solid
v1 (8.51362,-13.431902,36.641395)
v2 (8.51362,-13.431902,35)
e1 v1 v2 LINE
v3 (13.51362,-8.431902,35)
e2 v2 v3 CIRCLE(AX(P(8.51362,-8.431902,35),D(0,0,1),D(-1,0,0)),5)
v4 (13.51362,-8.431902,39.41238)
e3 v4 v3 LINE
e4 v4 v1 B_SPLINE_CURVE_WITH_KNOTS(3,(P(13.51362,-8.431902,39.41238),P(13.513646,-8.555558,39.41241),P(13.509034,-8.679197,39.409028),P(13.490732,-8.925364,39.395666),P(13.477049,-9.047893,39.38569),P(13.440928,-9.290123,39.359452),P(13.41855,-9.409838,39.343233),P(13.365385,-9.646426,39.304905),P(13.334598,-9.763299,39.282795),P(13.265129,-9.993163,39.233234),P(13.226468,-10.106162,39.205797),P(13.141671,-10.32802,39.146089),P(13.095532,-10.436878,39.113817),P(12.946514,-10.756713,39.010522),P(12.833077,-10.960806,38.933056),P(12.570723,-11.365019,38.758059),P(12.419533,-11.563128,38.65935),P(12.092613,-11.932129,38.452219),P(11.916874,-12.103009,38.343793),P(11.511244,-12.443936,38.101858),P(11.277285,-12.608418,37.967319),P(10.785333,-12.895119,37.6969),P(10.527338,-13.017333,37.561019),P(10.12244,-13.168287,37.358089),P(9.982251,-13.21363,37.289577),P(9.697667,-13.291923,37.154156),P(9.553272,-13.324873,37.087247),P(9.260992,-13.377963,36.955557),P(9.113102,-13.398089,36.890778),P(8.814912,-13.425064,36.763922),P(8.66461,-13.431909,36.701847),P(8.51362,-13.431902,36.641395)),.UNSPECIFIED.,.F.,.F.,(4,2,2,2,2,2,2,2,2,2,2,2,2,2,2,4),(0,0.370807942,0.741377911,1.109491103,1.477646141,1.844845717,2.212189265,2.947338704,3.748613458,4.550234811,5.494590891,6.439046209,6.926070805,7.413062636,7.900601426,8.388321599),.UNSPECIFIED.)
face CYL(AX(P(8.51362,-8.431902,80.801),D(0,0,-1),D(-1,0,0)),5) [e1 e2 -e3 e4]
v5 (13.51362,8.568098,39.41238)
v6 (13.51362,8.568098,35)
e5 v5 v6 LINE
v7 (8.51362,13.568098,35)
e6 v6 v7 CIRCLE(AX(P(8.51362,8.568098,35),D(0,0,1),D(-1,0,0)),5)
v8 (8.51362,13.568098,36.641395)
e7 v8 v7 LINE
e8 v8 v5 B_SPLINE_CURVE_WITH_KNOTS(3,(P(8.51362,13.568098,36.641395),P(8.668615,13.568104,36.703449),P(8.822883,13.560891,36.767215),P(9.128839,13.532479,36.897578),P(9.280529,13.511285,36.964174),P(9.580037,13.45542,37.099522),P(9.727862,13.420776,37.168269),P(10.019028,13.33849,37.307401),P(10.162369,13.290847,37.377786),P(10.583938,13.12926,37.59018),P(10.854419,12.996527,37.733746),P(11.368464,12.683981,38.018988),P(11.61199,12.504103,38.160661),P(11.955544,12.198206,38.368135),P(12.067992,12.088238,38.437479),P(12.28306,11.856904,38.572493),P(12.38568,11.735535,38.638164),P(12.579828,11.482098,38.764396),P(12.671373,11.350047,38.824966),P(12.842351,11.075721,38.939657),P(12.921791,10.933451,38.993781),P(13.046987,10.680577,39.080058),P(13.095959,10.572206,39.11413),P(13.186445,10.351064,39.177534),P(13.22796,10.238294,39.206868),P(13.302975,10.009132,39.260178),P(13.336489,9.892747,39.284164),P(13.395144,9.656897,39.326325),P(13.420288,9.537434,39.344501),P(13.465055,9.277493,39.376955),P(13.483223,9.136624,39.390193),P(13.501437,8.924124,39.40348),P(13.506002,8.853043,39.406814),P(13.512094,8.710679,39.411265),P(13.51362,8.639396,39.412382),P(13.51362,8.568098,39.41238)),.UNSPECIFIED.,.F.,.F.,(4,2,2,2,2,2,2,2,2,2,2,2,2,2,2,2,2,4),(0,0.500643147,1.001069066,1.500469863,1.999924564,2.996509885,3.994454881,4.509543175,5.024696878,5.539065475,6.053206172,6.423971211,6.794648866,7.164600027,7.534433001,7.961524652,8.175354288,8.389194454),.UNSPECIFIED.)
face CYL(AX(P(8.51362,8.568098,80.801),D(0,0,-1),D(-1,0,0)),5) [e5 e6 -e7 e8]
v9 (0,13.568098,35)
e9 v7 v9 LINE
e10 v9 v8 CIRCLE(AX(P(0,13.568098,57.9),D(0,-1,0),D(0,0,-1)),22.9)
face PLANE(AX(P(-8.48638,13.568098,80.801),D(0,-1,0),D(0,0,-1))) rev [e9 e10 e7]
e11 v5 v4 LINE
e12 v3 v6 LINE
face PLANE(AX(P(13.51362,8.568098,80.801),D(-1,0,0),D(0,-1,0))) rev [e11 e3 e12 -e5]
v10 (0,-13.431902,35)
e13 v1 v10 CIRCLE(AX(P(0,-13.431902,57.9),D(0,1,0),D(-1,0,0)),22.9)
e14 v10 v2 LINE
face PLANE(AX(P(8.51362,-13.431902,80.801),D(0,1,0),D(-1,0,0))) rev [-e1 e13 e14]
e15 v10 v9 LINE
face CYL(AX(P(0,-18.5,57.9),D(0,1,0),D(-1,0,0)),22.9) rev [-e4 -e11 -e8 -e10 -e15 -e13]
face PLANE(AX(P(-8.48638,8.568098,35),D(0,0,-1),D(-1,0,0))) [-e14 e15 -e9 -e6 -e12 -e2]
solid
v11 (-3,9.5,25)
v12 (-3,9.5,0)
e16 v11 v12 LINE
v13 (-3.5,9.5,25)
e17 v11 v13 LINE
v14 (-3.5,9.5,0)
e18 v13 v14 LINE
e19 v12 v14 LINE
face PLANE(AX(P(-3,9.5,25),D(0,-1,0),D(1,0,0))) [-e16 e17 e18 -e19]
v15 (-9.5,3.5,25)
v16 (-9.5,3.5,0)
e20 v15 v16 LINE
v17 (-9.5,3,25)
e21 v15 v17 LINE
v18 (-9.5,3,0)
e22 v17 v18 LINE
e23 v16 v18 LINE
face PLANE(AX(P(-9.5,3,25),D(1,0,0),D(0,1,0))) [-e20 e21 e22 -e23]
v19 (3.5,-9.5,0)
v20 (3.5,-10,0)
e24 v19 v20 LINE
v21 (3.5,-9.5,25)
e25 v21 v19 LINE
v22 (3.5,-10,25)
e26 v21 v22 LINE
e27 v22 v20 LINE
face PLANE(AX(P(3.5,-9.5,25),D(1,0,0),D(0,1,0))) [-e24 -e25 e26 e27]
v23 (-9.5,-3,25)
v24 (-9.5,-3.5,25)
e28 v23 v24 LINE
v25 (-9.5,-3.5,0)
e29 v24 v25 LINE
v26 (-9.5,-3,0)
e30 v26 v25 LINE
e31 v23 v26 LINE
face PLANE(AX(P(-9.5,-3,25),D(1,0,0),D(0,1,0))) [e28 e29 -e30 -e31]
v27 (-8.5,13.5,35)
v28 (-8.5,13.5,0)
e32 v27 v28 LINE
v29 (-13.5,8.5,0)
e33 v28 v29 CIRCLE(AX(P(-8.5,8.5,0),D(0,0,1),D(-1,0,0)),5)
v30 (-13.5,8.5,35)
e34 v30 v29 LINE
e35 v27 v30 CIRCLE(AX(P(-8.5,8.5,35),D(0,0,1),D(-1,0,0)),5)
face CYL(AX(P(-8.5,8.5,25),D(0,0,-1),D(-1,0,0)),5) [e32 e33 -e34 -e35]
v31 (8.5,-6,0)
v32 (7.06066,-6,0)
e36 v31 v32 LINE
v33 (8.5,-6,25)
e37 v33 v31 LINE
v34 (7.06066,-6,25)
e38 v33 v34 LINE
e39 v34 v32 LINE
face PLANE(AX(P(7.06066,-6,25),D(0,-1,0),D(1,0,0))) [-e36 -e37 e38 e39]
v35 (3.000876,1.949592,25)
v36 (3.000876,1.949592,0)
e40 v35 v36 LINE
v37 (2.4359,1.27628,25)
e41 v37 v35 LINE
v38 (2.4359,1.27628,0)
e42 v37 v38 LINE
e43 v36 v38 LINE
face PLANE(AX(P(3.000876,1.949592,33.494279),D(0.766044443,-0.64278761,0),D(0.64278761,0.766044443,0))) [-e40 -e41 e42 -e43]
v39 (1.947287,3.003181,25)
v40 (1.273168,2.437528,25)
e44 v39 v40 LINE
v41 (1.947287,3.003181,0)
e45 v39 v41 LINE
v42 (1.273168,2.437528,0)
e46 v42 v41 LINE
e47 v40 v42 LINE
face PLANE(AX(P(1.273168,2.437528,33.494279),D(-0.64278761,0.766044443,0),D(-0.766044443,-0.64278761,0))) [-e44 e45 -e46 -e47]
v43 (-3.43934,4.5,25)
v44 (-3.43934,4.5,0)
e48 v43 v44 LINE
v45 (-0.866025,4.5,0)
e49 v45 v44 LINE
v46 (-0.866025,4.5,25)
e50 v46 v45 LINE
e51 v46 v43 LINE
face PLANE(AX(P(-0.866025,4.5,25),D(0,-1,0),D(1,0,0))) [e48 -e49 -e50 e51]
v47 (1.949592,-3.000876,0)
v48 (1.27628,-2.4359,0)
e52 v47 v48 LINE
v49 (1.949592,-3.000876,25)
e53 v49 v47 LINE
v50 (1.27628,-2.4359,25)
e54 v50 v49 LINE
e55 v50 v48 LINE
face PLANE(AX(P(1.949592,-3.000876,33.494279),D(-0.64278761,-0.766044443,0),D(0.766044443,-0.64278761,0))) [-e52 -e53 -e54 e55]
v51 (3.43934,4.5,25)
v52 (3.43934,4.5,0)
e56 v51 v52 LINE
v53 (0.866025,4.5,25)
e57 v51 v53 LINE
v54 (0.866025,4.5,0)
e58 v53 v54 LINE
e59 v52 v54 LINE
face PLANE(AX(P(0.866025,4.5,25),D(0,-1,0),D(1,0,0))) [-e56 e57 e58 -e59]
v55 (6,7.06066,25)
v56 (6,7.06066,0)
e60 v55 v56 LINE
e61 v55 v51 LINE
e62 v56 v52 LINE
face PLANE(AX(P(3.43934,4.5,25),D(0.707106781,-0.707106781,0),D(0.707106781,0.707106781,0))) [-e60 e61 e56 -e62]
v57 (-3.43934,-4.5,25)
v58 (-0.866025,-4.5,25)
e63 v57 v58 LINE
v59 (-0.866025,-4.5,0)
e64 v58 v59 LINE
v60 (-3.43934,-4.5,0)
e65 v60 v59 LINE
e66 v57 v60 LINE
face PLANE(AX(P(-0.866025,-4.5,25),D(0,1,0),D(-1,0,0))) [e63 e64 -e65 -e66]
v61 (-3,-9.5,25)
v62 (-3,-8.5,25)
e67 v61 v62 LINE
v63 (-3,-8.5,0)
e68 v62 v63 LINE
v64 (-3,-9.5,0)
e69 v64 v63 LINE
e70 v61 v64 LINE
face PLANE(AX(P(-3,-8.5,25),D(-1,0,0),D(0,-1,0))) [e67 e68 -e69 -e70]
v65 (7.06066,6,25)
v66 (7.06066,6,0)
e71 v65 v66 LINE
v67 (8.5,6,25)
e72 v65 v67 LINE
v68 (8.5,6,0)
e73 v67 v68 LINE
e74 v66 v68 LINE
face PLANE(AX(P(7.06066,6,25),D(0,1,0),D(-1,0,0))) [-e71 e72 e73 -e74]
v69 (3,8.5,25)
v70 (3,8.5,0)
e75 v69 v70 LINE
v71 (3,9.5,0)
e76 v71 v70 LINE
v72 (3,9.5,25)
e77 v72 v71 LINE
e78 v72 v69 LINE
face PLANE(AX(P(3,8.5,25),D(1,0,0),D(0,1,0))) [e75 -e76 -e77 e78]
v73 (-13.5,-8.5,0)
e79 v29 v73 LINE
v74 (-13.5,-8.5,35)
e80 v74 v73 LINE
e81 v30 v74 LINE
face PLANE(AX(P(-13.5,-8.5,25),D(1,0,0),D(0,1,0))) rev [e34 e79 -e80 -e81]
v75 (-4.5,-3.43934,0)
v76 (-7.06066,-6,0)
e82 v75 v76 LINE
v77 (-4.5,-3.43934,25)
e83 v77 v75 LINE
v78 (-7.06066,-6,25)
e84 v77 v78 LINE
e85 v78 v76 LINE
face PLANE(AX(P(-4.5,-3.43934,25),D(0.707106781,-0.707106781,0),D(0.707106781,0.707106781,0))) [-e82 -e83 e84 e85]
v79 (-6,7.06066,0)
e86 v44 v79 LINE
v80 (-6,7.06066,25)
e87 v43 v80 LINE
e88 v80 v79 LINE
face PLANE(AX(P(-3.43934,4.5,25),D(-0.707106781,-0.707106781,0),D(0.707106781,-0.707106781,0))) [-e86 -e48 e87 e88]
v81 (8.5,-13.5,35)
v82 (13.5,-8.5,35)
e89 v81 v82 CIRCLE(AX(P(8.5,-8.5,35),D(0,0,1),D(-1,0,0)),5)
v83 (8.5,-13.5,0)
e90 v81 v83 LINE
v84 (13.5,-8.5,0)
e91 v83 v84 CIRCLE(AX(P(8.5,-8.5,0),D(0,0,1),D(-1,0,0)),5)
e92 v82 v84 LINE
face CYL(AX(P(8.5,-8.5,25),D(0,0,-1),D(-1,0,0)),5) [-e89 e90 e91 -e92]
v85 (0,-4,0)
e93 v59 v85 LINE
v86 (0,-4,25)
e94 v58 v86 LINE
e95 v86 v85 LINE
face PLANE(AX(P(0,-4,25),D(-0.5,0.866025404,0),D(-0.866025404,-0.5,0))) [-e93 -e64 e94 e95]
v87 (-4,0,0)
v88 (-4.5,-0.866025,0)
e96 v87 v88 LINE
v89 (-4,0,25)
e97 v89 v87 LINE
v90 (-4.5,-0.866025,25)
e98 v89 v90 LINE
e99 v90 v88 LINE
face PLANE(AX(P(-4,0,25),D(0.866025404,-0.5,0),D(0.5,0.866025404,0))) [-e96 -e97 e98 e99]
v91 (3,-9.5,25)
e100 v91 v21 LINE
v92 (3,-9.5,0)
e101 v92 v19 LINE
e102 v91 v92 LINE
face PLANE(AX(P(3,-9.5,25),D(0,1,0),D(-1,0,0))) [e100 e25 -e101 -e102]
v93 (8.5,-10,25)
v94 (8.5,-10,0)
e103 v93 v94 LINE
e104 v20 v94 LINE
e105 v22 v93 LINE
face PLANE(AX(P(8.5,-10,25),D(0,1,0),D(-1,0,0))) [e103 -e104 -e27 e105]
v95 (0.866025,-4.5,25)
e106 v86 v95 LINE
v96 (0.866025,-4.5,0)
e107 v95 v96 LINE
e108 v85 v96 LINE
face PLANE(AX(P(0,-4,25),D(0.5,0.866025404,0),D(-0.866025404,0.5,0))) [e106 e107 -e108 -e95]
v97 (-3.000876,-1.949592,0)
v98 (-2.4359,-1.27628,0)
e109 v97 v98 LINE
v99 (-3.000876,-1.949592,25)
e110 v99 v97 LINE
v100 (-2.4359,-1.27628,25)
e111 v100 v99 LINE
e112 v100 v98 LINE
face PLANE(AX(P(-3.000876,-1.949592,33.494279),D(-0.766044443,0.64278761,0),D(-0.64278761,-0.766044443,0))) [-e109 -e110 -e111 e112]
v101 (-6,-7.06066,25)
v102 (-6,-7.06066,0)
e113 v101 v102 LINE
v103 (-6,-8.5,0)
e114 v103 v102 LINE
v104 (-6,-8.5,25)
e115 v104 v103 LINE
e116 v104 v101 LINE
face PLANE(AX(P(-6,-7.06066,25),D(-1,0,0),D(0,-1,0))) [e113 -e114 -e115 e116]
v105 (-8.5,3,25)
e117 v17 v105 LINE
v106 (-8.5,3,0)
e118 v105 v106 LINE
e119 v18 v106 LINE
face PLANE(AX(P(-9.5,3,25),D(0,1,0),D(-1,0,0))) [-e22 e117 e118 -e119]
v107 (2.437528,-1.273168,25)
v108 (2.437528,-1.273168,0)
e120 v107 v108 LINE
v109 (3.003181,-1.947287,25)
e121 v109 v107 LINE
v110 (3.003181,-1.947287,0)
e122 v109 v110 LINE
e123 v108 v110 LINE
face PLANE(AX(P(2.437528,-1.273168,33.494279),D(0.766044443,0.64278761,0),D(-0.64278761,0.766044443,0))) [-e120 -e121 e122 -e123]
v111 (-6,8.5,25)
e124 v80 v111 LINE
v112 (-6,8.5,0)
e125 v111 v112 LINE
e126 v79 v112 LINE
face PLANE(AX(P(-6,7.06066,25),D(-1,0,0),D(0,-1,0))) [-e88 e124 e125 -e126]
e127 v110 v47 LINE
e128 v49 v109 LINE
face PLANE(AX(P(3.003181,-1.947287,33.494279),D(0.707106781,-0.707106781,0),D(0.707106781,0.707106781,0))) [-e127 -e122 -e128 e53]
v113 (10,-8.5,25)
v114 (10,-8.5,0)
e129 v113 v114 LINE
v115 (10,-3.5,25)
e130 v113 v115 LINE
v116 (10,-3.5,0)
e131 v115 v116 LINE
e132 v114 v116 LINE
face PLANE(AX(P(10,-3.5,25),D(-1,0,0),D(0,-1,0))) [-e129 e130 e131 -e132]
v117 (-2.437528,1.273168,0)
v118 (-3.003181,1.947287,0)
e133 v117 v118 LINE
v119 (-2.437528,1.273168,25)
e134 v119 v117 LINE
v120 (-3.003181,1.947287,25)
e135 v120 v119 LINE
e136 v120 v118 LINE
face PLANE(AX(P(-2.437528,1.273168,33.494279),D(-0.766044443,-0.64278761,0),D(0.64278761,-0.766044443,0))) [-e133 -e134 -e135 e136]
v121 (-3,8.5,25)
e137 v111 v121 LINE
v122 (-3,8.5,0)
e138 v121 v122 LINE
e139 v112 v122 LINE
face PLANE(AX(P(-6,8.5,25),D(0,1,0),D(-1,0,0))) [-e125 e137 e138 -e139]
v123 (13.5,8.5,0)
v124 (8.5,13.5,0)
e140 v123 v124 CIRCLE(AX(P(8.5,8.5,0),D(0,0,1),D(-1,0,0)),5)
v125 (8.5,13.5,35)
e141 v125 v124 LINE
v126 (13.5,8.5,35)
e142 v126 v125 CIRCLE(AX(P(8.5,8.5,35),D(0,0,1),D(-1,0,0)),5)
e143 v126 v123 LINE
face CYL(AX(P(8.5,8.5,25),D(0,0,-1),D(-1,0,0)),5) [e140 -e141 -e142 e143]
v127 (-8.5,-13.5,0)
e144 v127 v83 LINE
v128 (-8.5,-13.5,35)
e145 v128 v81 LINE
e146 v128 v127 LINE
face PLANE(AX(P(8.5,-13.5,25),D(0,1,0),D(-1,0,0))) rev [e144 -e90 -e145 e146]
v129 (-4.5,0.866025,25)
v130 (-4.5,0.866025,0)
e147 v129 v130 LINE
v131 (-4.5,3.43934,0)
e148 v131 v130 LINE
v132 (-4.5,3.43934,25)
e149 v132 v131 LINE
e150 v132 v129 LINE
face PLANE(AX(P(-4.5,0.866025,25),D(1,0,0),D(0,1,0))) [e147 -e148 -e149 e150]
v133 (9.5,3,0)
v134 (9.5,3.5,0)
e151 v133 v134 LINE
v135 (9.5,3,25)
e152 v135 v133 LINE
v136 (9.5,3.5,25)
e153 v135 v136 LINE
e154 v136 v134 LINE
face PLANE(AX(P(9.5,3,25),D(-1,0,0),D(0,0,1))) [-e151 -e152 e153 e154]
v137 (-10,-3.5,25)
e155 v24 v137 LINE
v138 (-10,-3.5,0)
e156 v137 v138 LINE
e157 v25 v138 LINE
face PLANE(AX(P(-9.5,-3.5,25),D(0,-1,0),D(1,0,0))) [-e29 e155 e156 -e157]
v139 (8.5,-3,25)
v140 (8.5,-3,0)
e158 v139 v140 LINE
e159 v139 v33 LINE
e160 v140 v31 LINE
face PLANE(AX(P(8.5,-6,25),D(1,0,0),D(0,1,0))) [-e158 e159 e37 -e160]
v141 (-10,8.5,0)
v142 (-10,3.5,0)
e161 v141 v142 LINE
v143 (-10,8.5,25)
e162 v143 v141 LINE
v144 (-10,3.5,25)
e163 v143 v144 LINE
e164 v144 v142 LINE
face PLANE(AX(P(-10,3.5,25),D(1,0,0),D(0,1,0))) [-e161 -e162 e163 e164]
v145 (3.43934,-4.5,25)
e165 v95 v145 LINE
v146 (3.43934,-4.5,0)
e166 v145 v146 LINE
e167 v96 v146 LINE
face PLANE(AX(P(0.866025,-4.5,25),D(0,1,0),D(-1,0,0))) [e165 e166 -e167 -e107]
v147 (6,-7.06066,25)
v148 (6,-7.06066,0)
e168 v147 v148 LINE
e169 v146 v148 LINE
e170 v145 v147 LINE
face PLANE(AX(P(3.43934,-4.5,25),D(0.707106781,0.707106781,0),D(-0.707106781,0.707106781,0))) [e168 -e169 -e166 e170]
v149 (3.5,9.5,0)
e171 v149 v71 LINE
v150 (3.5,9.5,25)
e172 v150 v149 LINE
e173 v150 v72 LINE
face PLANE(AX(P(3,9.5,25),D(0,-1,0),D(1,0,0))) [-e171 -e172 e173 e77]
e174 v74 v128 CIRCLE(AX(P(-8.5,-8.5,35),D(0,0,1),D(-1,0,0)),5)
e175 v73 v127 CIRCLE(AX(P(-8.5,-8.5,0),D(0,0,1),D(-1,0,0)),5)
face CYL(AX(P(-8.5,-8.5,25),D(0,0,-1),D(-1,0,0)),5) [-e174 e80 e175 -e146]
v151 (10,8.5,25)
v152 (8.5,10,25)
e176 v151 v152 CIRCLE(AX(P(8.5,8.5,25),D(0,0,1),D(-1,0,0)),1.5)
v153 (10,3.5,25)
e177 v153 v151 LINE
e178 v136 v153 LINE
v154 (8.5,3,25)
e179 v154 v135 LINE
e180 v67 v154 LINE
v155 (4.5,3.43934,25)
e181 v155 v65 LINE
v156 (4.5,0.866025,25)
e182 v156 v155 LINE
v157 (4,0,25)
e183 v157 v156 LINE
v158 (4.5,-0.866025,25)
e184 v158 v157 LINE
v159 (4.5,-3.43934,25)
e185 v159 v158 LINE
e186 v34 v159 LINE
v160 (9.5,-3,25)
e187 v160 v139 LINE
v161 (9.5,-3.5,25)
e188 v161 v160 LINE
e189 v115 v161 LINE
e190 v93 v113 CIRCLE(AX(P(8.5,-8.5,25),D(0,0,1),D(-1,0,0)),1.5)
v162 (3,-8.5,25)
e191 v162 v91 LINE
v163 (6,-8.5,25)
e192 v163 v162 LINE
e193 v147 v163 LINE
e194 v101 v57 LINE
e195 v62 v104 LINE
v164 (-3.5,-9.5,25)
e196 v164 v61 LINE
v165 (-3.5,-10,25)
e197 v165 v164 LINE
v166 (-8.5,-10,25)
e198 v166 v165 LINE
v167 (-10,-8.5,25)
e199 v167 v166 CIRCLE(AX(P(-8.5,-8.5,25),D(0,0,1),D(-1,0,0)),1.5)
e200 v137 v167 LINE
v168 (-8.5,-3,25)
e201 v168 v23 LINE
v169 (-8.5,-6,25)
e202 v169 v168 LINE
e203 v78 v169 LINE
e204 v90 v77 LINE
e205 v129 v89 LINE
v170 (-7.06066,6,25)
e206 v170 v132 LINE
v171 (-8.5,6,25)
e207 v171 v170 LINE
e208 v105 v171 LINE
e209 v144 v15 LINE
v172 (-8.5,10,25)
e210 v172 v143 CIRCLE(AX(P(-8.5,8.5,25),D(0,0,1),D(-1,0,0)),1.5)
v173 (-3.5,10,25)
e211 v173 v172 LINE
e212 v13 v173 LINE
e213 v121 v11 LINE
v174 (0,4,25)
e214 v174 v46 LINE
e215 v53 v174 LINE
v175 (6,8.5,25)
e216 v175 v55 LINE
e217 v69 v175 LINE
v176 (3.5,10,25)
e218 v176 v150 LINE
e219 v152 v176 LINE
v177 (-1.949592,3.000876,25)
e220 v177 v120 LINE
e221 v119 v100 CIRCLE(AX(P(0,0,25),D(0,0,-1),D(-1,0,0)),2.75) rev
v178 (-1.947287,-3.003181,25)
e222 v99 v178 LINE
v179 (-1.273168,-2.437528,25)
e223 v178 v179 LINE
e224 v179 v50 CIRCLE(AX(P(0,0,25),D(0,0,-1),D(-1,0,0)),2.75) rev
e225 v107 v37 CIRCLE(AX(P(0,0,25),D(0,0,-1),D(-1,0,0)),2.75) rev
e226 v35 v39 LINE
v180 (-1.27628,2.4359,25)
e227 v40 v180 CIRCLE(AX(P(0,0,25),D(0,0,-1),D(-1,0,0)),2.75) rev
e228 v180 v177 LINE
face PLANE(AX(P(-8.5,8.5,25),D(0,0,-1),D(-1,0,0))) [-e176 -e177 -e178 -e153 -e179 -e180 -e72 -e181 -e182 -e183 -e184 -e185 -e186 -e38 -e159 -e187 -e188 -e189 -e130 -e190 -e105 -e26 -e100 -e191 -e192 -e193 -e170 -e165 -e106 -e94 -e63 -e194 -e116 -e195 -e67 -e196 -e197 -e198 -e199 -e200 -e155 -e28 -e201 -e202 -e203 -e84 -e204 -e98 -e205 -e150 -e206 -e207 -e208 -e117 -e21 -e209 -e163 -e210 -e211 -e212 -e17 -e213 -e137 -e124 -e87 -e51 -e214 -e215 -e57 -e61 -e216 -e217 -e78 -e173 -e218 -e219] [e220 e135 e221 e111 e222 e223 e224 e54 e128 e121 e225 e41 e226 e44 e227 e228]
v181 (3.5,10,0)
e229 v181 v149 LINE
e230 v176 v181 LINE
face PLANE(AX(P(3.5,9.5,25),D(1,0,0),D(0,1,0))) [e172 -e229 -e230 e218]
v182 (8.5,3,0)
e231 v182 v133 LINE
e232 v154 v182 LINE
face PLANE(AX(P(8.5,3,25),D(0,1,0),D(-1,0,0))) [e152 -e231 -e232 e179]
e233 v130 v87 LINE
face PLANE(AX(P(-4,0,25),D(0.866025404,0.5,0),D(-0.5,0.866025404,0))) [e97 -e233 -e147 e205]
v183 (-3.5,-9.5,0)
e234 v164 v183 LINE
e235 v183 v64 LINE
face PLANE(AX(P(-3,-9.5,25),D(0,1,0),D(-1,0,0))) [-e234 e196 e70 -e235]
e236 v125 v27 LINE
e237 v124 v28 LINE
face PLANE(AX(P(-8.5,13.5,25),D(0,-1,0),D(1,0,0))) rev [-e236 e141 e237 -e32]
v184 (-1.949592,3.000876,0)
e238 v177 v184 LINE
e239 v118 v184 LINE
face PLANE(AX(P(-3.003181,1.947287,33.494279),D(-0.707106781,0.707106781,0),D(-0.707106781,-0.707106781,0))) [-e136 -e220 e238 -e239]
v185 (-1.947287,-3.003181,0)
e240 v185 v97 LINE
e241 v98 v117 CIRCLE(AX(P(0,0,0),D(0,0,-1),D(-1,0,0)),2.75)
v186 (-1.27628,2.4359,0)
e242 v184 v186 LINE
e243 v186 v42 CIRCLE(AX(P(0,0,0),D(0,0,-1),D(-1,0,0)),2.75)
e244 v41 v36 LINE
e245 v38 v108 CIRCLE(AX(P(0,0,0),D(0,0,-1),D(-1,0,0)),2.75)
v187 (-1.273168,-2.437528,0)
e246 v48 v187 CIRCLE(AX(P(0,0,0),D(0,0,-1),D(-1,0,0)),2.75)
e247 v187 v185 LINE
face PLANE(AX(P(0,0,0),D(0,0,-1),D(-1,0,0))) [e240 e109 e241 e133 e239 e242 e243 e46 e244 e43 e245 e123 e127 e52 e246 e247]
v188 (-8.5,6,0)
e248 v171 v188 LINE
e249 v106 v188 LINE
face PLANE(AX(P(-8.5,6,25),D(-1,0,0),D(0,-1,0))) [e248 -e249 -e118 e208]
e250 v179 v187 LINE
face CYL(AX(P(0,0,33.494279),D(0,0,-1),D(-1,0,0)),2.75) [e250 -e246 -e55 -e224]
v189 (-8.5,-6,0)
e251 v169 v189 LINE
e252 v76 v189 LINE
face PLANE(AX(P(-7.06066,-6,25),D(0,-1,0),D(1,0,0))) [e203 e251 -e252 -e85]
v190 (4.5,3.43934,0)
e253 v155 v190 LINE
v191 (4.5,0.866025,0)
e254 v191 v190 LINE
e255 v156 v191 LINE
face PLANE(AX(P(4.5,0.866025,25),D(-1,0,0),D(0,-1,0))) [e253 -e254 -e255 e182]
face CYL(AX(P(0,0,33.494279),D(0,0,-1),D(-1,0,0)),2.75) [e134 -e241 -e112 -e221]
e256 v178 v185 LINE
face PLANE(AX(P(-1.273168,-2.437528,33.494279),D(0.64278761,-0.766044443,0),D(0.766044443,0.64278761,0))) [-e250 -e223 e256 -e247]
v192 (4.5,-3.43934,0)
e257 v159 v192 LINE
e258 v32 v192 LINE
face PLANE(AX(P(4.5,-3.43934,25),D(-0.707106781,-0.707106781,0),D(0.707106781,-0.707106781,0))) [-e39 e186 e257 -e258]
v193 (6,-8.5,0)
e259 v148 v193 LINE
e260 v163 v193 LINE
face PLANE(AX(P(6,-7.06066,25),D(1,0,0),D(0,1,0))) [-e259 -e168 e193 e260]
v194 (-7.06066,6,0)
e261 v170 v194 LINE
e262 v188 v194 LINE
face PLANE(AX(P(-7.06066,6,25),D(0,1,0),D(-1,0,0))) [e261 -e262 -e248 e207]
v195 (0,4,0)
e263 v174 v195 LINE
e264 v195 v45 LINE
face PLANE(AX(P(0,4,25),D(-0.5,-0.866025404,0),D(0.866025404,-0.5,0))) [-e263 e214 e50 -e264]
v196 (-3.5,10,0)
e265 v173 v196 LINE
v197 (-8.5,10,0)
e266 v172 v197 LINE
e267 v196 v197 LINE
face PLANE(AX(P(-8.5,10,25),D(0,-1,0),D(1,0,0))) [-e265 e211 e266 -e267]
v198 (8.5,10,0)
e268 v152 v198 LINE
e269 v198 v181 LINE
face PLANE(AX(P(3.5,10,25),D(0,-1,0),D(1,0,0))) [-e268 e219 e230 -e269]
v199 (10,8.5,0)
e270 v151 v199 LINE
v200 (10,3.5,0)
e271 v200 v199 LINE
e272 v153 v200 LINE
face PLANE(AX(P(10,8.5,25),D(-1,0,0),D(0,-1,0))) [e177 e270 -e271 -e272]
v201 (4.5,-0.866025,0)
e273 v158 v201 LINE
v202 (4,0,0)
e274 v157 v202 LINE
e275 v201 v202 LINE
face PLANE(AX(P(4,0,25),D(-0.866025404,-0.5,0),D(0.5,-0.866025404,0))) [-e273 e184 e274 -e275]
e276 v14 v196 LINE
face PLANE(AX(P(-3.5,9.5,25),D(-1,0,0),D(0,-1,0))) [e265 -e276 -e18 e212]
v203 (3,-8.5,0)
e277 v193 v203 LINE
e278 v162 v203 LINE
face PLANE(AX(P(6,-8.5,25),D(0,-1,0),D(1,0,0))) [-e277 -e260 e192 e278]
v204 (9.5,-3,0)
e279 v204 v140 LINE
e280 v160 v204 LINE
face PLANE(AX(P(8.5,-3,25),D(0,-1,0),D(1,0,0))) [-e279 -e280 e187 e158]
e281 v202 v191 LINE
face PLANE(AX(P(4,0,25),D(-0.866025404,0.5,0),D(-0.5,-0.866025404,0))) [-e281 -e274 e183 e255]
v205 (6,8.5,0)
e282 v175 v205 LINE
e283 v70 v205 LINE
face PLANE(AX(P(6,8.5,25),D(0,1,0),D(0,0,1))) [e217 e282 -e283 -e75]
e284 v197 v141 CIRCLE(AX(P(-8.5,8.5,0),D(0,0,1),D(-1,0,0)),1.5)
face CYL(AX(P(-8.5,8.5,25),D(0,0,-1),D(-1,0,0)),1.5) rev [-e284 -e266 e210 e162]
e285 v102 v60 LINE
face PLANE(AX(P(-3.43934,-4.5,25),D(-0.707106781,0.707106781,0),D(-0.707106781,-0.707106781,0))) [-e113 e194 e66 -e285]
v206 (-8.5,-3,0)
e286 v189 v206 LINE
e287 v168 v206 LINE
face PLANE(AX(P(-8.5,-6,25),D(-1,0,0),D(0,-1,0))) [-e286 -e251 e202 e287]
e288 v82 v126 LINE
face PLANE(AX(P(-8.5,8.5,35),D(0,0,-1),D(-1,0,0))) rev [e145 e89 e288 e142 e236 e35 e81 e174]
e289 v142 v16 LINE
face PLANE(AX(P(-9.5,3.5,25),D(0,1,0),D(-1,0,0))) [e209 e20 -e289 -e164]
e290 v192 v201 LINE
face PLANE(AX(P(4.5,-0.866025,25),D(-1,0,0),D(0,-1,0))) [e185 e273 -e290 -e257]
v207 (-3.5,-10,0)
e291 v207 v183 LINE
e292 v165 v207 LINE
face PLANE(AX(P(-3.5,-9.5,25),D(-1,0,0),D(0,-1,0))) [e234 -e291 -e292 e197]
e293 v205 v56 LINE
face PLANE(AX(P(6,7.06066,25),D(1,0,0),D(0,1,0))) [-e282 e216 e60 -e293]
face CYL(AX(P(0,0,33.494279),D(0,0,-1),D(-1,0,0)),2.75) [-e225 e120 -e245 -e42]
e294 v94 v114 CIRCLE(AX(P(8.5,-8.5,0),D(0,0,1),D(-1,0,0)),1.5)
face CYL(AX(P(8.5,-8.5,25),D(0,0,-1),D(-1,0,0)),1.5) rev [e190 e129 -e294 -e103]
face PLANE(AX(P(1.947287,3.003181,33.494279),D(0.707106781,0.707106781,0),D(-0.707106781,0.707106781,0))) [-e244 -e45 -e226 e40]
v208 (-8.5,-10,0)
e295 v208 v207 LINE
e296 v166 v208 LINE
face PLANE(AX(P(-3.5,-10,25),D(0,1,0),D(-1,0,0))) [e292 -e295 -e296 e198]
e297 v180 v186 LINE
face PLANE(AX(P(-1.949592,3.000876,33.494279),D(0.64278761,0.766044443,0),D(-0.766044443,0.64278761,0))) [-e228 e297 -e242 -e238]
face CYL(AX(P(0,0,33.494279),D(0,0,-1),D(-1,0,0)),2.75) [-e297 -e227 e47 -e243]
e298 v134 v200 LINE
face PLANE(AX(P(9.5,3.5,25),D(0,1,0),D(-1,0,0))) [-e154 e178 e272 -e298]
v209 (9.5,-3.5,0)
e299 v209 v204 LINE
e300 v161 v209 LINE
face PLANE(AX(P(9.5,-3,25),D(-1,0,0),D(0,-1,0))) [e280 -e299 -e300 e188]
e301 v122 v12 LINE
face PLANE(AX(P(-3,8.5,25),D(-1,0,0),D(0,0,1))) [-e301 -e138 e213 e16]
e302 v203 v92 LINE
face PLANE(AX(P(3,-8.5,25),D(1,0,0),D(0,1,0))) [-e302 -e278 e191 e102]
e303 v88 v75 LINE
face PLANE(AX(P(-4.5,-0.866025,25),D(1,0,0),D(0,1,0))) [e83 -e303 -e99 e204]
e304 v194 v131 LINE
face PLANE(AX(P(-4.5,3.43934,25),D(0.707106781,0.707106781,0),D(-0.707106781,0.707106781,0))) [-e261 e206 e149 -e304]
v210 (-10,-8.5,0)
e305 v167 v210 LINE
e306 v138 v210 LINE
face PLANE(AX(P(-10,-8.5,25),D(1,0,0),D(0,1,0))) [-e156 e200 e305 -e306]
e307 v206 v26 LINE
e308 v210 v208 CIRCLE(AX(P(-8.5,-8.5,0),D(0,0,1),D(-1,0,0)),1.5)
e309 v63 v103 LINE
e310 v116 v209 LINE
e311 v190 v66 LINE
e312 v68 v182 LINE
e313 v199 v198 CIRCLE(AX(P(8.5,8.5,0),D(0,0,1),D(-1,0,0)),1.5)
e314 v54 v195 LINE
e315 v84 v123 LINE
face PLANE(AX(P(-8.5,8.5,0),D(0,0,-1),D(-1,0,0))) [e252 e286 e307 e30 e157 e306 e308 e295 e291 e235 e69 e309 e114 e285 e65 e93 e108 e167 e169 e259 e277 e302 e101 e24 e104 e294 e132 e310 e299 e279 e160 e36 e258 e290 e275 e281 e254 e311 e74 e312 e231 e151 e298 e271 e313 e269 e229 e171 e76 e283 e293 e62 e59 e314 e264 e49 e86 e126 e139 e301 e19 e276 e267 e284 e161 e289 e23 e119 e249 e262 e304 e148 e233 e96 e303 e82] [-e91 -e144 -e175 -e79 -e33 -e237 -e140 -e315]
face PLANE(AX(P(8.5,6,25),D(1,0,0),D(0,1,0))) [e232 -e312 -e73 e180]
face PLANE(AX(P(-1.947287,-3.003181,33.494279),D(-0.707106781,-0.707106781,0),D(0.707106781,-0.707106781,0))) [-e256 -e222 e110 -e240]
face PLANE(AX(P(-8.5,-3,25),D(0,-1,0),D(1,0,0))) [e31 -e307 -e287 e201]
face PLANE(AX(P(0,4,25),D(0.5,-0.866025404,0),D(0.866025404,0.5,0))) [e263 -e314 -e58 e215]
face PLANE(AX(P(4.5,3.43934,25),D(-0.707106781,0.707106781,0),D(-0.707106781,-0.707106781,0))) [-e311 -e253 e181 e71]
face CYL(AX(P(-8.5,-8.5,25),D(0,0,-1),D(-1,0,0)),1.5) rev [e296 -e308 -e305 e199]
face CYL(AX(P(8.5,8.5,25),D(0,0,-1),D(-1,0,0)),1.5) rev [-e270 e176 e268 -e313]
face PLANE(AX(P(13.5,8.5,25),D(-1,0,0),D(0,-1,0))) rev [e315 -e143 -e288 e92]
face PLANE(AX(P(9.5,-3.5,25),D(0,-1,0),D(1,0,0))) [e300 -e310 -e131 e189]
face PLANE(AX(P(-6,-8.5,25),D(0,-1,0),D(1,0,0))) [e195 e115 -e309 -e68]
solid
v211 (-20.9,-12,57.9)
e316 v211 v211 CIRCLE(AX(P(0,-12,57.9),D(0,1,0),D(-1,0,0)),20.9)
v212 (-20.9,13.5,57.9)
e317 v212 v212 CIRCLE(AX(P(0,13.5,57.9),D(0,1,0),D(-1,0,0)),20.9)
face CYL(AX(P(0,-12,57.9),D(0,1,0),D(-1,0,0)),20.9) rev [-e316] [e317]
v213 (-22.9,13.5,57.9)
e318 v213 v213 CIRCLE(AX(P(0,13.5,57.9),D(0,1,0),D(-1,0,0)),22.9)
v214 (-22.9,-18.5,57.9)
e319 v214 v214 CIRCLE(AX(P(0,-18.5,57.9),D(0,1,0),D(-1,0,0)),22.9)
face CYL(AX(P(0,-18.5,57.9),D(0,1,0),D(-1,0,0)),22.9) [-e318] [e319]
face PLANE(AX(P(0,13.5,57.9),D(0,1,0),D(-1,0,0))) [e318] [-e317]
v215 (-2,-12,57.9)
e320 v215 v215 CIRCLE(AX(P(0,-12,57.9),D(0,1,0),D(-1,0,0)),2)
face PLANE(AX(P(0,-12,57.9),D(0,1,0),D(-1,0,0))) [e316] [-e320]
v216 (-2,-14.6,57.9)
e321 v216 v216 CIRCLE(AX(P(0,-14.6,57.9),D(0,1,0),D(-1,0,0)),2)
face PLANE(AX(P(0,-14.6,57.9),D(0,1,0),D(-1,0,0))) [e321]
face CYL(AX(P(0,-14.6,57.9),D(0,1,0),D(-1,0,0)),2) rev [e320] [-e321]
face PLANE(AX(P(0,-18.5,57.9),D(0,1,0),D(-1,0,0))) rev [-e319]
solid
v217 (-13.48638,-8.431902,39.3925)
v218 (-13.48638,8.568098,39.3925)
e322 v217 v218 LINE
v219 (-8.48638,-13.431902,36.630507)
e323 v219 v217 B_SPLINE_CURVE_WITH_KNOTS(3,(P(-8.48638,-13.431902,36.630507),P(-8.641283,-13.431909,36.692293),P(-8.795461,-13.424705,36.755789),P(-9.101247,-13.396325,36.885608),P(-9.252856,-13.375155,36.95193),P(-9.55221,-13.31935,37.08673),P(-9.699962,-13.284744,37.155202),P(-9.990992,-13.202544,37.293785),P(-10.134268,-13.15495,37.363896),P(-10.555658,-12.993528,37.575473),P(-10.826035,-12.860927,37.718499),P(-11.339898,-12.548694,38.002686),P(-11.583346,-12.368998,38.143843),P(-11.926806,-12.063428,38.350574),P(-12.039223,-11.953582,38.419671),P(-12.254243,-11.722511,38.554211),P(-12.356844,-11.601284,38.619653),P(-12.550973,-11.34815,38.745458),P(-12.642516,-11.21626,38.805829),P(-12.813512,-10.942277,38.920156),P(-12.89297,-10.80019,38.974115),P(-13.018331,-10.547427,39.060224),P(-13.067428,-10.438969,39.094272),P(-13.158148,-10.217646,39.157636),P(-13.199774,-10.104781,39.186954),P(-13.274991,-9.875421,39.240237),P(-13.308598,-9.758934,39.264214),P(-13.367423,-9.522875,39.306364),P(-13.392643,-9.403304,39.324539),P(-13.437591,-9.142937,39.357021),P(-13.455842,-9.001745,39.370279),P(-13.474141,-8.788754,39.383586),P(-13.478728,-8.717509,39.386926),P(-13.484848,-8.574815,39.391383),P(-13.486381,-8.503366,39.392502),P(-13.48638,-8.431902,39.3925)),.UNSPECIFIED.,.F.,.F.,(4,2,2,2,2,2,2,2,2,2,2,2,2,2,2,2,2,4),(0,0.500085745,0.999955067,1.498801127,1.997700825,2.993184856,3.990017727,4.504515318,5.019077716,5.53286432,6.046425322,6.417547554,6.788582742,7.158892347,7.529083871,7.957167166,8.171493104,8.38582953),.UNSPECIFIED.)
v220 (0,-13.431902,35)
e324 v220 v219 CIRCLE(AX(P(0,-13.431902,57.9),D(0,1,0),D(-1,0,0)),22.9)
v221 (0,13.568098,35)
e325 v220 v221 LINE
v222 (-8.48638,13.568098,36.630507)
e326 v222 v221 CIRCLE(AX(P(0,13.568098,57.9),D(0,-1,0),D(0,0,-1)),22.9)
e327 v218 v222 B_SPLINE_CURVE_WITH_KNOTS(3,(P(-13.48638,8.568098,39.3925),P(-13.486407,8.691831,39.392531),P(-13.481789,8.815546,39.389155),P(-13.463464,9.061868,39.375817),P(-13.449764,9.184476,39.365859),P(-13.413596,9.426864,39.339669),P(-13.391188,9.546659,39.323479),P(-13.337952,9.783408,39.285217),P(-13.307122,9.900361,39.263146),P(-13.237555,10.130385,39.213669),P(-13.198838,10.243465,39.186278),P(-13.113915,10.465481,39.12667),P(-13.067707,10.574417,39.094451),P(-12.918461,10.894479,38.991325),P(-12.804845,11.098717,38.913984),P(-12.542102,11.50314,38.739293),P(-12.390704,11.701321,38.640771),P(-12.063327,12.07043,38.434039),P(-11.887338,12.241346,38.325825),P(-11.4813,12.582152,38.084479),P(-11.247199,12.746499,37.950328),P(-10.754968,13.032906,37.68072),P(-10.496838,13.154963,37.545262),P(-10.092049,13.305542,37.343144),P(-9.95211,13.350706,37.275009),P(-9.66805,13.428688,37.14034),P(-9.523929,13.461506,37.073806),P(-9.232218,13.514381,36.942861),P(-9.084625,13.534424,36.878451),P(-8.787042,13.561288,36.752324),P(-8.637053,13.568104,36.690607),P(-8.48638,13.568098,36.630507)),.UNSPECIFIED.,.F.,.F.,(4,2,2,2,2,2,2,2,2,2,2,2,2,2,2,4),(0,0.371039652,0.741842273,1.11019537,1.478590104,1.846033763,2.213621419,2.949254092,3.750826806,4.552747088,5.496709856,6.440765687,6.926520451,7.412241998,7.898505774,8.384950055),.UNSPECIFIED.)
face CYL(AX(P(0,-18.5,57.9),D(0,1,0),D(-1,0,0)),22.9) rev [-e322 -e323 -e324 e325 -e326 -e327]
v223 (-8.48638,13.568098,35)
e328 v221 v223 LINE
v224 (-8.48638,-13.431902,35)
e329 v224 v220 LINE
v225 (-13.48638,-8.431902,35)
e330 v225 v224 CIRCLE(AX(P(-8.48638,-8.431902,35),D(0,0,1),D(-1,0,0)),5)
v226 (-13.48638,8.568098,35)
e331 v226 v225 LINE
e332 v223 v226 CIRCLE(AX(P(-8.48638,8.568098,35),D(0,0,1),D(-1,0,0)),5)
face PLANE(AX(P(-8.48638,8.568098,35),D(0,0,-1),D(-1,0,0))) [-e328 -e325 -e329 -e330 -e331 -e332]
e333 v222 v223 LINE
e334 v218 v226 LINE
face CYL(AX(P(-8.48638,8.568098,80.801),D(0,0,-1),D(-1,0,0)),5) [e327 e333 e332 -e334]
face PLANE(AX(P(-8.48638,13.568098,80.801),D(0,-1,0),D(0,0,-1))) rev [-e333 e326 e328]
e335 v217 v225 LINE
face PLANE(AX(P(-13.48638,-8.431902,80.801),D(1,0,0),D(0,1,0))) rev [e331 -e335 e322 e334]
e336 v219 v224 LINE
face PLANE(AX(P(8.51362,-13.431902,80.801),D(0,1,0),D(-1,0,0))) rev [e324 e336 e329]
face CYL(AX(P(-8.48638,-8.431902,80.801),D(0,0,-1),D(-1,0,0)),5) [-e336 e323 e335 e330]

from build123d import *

# Parameters (mm, degrees)
BOSS_EXTRU_1_DEPTH      = 25
BOSS_EXTRU_2_DEPTH      = 10
ESQUISSE4_R             = 22.9
BOSS_EXTRU_3_DEPTH      = 32
BOSS_EXTRU_5_REACH      = 56.445
BOSS_EXTRU_5_END_RADIUS = 22.9
ESQUISSE6_R             = 20.9
ENL_V_MAT_EXTRU_1_DEPTH = 25.5
ESQUISSE8_R             = 2
ENL_V_MAT_EXTRU_3_DEPTH = 2.6
BOSS_EXTRU_6_START      = -25
BOSS_EXTRU_6_DEPTH      = 25


# Read off the part's stored shape, not the designer's step: Boss.-Extru.6
with BuildPart() as part:
    # Esquisse2 → Boss.-Extru.1 (new body)
    with BuildSketch(Plane.XY):
        with BuildLine():
            Line((13.5, 8.5), (13.5, -8.5))
            ThreePointArc((13.5, -8.5), (12.035533906, -12.035533906), (8.5, -13.5))
            Line((8.5, -13.5), (-8.5, -13.5))
            ThreePointArc((-8.5, -13.5), (-12.035533906, -12.035533906), (-13.5, -8.5))
            Line((-13.5, -8.5), (-13.5, 8.5))
            ThreePointArc((-13.5, 8.5), (-12.035533906, 12.035533906), (-8.5, 13.5))
            Line((-8.5, 13.5), (8.5, 13.5))
            ThreePointArc((8.5, 13.5), (12.035533906, 12.035533906), (13.5, 8.5))
        make_face()
        with BuildLine():
            Line((0, 4), (-0.866025404, 4.5))
            Line((-0.866025404, 4.5), (-3.439339828, 4.5))
            Line((-3.439339828, 4.5), (-6, 7.060660172))
            Line((-6, 7.060660172), (-6, 8.5))
            Line((-6, 8.5), (-3, 8.5))
            Line((-3, 8.5), (-3, 9.5))
            Line((-3, 9.5), (-3.5, 9.5))
            Line((-3.5, 9.5), (-3.5, 10))
            Line((-3.5, 10), (-8.5, 10))
            ThreePointArc((-8.5, 10), (-9.560660172, 9.560660172), (-10, 8.5))
            Line((-10, 8.5), (-10, 3.5))
            Line((-10, 3.5), (-9.5, 3.5))
            Line((-9.5, 3.5), (-9.5, 3))
            Line((-9.5, 3), (-8.5, 3))
            Line((-8.5, 3), (-8.5, 6))
            Line((-8.5, 6), (-7.060660172, 6))
            Line((-7.060660172, 6), (-4.5, 3.439339828))
            Line((-4.5, 3.439339828), (-4.5, 0.866025404))
            Line((-4.5, 0.866025404), (-4, 0))
            Line((-4, 0), (-4.5, -0.866025404))
            Line((-4.5, -0.866025404), (-4.5, -3.439339828))
            Line((-4.5, -3.439339828), (-7.060660172, -6))
            Line((-7.060660172, -6), (-8.5, -6))
            Line((-8.5, -6), (-8.5, -3))
            Line((-8.5, -3), (-9.5, -3))
            Line((-9.5, -3), (-9.5, -3.5))
            Line((-9.5, -3.5), (-10, -3.5))
            Line((-10, -3.5), (-10, -8.5))
            ThreePointArc((-10, -8.5), (-9.560660172, -9.560660172), (-8.5, -10))
            Line((-8.5, -10), (-3.5, -10))
            Line((-3.5, -10), (-3.5, -9.5))
            Line((-3.5, -9.5), (-3, -9.5))
            Line((-3, -9.5), (-3, -8.5))
            Line((-3, -8.5), (-6, -8.5))
            Line((-6, -8.5), (-6, -7.060660172))
            Line((-6, -7.060660172), (-3.439339828, -4.5))
            Line((-3.439339828, -4.5), (-0.866025404, -4.5))
            Line((-0.866025404, -4.5), (0, -4))
            Line((0, -4), (0.866025404, -4.5))
            Line((0.866025404, -4.5), (3.439339828, -4.5))
            Line((3.439339828, -4.5), (6, -7.060660172))
            Line((6, -7.060660172), (6, -8.5))
            Line((6, -8.5), (3, -8.5))
            Line((3, -8.5), (3, -9.5))
            Line((3, -9.5), (3.5, -9.5))
            Line((3.5, -9.5), (3.5, -10))
            Line((3.5, -10), (8.5, -10))
            ThreePointArc((8.5, -10), (9.560660172, -9.560660172), (10, -8.5))
            Line((10, -8.5), (10, -3.5))
            Line((10, -3.5), (9.5, -3.5))
            Line((9.5, -3.5), (9.5, -3))
            Line((9.5, -3), (8.5, -3))
            Line((8.5, -3), (8.5, -6))
            Line((8.5, -6), (7.060660172, -6))
            Line((7.060660172, -6), (4.5, -3.439339828))
            Line((4.5, -3.439339828), (4.5, -0.866025404))
            Line((4.5, -0.866025404), (4, 0))
            Line((4, 0), (4.5, 0.866025404))
            Line((4.5, 0.866025404), (4.5, 3.439339828))
            Line((4.5, 3.439339828), (7.060660172, 6))
            Line((7.060660172, 6), (8.5, 6))
            Line((8.5, 6), (8.5, 3))
            Line((8.5, 3), (9.5, 3))
            Line((9.5, 3), (9.5, 3.5))
            Line((9.5, 3.5), (10, 3.5))
            Line((10, 3.5), (10, 8.5))
            ThreePointArc((10, 8.5), (9.560660172, 9.560660172), (8.5, 10))
            Line((8.5, 10), (3.5, 10))
            Line((3.5, 10), (3.5, 9.5))
            Line((3.5, 9.5), (3, 9.5))
            Line((3, 9.5), (3, 8.5))
            Line((3, 8.5), (6, 8.5))
            Line((6, 8.5), (6, 7.060660172))
            Line((6, 7.060660172), (3.439339828, 4.5))
            Line((3.439339828, 4.5), (0.866025404, 4.5))
            Line((0.866025404, 4.5), (0, 4))
        make_face(mode=Mode.SUBTRACT)
    extrude(amount=BOSS_EXTRU_1_DEPTH)

    # Esquisse3 → Boss.-Extru.2 (add)
    with BuildSketch(Plane.XY.offset(25)):
        with BuildLine():
            Line((-8.5, 13.5), (8.5, 13.5))
            ThreePointArc((8.5, 13.5), (12.035533906, 12.035533906), (13.5, 8.5))
            Line((13.5, 8.5), (13.5, -8.5))
            ThreePointArc((13.5, -8.5), (12.035533906, -12.035533906), (8.5, -13.5))
            Line((8.5, -13.5), (-8.5, -13.5))
            ThreePointArc((-8.5, -13.5), (-12.035533906, -12.035533906), (-13.5, -8.5))
            Line((-13.5, -8.5), (-13.5, 8.5))
            ThreePointArc((-13.5, 8.5), (-12.035533906, 12.035533906), (-8.5, 13.5))
        make_face()
    extrude(amount=BOSS_EXTRU_2_DEPTH)

    # Boss.-Extru.6 outline → Boss.-Extru.6 (add)
    with BuildSketch(Plane(origin=(0, 0, 0), x_dir=(-1, 0, 0), z_dir=(0, 0, -1)).offset(BOSS_EXTRU_6_START)):
        with BuildLine():
            Line((-1.273167982, 2.43752811), (-1.947287092, 3.003181207))
            Line((-1.947287092, 3.003181207), (-3.000876196, 1.949592103))
            Line((-3.000876196, 1.949592103), (-2.435900169, 1.276279893))
            ThreePointArc((-2.435900169, 1.276279893), (-2.749999439, 0.001756003), (-2.43752811, -1.273167982))
            Line((-2.43752811, -1.273167982), (-3.003181207, -1.947287092))
            Line((-3.003181207, -1.947287092), (-1.949592103, -3.000876196))
            Line((-1.949592103, -3.000876196), (-1.276279893, -2.435900169))
            ThreePointArc((-1.276279893, -2.435900169), (-0.001756003, -2.749999439), (1.273167982, -2.43752811))
            Line((1.273167982, -2.43752811), (1.947287092, -3.003181207))
            Line((1.947287092, -3.003181207), (3.000876196, -1.949592103))
            Line((3.000876196, -1.949592103), (2.435900169, -1.276279893))
            ThreePointArc((2.435900169, -1.276279893), (2.749999439, -0.001756003), (2.43752811, 1.273167982))
            Line((2.43752811, 1.273167982), (3.003181207, 1.947287092))
            Line((3.003181207, 1.947287092), (1.949592103, 3.000876196))
            Line((1.949592103, 3.000876196), (1.276279893, 2.435900169))
            ThreePointArc((1.276279893, 2.435900169), (0.001756003, 2.749999439), (-1.273167982, 2.43752811))
        make_face()
    extrude(amount=BOSS_EXTRU_6_DEPTH)


with BuildPart() as body_2:
    # Esquisse4 → Boss.-Extru.3 (new body)
    with BuildSketch(Plane(origin=(0, 13.5, 0), x_dir=(1, 0, 0), z_dir=(0, 1, 0))):
        with Locations(Location((0, -57.9, 0), (0, 0, 180))):
            Circle(ESQUISSE4_R)
    extrude(amount=-BOSS_EXTRU_3_DEPTH)

    # Esquisse6 → Enlèv. mat.-Extru.1 (cut)
    with BuildSketch(Plane(origin=(0, 13.5, 0), x_dir=(1, 0, 0), z_dir=(0, 1, 0))):
        with Locations(Location((0, -57.9, 0), (0, 0, 180))):
            Circle(ESQUISSE6_R)
    extrude(amount=-ENL_V_MAT_EXTRU_1_DEPTH, mode=Mode.SUBTRACT)

    # Esquisse8 → Enlèv. mat.-Extru.3 (cut)
    with BuildSketch(Plane(origin=(0, -12, 0), x_dir=(1, 0, 0), z_dir=(0, 1, 0))):
        with Locations(Location((0, -57.9, 0), (0, 0, 180))):
            Circle(ESQUISSE8_R)
    extrude(amount=-ENL_V_MAT_EXTRU_3_DEPTH, mode=Mode.SUBTRACT)


with BuildPart() as body_3:
    # Boss.-Extru.5: up to this cylinder (the profile starts outside it)
    boss_extru_5_end = Plane(origin=(0, 0.068098, 57.9), z_dir=(0, 1, 0)) * Cylinder(BOSS_EXTRU_5_END_RADIUS, 159.69, mode=Mode.PRIVATE)
    # Esquisse5 → Boss.-Extru.5 (new, up to the surface)
    with BuildSketch(Plane.XY.offset(35), mode=Mode.PRIVATE) as boss_extru_5_sk1:
        with BuildLine():
            Line((-8.486380485, 13.568097576), (8.513619515, 13.568097576))
            ThreePointArc((8.513619515, 13.568097576), (12.049153421, 12.103631482), (13.513619515, 8.568097576))
            Line((13.513619515, 8.568097576), (13.513619515, -8.431902424))
            ThreePointArc((13.513619515, -8.431902424), (12.049153421, -11.96743633), (8.513619515, -13.431902424))
            Line((8.513619515, -13.431902424), (-8.486380485, -13.431902424))
            ThreePointArc((-8.486380485, -13.431902424), (-12.021914391, -11.96743633), (-13.486380485, -8.431902424))
            Line((-13.486380485, -8.431902424), (-13.486380485, 8.568097576))
            ThreePointArc((-13.486380485, 8.568097576), (-12.021914391, 12.103631482), (-8.486380485, 13.568097576))
        make_face()
    boss_extru_5_tool1 = extrude(boss_extru_5_sk1.sketch, amount=BOSS_EXTRU_5_REACH, mode=Mode.PRIVATE) - boss_extru_5_end
    add(boss_extru_5_tool1.solids().sort_by_distance((0.01362, 0.068098, 35))[0])
    add(boss_extru_5_tool1.solids().sort_by_distance((0.01362, 0.068098, 35))[1])


solid = Compound([part.part, body_2.part, body_3.part])
